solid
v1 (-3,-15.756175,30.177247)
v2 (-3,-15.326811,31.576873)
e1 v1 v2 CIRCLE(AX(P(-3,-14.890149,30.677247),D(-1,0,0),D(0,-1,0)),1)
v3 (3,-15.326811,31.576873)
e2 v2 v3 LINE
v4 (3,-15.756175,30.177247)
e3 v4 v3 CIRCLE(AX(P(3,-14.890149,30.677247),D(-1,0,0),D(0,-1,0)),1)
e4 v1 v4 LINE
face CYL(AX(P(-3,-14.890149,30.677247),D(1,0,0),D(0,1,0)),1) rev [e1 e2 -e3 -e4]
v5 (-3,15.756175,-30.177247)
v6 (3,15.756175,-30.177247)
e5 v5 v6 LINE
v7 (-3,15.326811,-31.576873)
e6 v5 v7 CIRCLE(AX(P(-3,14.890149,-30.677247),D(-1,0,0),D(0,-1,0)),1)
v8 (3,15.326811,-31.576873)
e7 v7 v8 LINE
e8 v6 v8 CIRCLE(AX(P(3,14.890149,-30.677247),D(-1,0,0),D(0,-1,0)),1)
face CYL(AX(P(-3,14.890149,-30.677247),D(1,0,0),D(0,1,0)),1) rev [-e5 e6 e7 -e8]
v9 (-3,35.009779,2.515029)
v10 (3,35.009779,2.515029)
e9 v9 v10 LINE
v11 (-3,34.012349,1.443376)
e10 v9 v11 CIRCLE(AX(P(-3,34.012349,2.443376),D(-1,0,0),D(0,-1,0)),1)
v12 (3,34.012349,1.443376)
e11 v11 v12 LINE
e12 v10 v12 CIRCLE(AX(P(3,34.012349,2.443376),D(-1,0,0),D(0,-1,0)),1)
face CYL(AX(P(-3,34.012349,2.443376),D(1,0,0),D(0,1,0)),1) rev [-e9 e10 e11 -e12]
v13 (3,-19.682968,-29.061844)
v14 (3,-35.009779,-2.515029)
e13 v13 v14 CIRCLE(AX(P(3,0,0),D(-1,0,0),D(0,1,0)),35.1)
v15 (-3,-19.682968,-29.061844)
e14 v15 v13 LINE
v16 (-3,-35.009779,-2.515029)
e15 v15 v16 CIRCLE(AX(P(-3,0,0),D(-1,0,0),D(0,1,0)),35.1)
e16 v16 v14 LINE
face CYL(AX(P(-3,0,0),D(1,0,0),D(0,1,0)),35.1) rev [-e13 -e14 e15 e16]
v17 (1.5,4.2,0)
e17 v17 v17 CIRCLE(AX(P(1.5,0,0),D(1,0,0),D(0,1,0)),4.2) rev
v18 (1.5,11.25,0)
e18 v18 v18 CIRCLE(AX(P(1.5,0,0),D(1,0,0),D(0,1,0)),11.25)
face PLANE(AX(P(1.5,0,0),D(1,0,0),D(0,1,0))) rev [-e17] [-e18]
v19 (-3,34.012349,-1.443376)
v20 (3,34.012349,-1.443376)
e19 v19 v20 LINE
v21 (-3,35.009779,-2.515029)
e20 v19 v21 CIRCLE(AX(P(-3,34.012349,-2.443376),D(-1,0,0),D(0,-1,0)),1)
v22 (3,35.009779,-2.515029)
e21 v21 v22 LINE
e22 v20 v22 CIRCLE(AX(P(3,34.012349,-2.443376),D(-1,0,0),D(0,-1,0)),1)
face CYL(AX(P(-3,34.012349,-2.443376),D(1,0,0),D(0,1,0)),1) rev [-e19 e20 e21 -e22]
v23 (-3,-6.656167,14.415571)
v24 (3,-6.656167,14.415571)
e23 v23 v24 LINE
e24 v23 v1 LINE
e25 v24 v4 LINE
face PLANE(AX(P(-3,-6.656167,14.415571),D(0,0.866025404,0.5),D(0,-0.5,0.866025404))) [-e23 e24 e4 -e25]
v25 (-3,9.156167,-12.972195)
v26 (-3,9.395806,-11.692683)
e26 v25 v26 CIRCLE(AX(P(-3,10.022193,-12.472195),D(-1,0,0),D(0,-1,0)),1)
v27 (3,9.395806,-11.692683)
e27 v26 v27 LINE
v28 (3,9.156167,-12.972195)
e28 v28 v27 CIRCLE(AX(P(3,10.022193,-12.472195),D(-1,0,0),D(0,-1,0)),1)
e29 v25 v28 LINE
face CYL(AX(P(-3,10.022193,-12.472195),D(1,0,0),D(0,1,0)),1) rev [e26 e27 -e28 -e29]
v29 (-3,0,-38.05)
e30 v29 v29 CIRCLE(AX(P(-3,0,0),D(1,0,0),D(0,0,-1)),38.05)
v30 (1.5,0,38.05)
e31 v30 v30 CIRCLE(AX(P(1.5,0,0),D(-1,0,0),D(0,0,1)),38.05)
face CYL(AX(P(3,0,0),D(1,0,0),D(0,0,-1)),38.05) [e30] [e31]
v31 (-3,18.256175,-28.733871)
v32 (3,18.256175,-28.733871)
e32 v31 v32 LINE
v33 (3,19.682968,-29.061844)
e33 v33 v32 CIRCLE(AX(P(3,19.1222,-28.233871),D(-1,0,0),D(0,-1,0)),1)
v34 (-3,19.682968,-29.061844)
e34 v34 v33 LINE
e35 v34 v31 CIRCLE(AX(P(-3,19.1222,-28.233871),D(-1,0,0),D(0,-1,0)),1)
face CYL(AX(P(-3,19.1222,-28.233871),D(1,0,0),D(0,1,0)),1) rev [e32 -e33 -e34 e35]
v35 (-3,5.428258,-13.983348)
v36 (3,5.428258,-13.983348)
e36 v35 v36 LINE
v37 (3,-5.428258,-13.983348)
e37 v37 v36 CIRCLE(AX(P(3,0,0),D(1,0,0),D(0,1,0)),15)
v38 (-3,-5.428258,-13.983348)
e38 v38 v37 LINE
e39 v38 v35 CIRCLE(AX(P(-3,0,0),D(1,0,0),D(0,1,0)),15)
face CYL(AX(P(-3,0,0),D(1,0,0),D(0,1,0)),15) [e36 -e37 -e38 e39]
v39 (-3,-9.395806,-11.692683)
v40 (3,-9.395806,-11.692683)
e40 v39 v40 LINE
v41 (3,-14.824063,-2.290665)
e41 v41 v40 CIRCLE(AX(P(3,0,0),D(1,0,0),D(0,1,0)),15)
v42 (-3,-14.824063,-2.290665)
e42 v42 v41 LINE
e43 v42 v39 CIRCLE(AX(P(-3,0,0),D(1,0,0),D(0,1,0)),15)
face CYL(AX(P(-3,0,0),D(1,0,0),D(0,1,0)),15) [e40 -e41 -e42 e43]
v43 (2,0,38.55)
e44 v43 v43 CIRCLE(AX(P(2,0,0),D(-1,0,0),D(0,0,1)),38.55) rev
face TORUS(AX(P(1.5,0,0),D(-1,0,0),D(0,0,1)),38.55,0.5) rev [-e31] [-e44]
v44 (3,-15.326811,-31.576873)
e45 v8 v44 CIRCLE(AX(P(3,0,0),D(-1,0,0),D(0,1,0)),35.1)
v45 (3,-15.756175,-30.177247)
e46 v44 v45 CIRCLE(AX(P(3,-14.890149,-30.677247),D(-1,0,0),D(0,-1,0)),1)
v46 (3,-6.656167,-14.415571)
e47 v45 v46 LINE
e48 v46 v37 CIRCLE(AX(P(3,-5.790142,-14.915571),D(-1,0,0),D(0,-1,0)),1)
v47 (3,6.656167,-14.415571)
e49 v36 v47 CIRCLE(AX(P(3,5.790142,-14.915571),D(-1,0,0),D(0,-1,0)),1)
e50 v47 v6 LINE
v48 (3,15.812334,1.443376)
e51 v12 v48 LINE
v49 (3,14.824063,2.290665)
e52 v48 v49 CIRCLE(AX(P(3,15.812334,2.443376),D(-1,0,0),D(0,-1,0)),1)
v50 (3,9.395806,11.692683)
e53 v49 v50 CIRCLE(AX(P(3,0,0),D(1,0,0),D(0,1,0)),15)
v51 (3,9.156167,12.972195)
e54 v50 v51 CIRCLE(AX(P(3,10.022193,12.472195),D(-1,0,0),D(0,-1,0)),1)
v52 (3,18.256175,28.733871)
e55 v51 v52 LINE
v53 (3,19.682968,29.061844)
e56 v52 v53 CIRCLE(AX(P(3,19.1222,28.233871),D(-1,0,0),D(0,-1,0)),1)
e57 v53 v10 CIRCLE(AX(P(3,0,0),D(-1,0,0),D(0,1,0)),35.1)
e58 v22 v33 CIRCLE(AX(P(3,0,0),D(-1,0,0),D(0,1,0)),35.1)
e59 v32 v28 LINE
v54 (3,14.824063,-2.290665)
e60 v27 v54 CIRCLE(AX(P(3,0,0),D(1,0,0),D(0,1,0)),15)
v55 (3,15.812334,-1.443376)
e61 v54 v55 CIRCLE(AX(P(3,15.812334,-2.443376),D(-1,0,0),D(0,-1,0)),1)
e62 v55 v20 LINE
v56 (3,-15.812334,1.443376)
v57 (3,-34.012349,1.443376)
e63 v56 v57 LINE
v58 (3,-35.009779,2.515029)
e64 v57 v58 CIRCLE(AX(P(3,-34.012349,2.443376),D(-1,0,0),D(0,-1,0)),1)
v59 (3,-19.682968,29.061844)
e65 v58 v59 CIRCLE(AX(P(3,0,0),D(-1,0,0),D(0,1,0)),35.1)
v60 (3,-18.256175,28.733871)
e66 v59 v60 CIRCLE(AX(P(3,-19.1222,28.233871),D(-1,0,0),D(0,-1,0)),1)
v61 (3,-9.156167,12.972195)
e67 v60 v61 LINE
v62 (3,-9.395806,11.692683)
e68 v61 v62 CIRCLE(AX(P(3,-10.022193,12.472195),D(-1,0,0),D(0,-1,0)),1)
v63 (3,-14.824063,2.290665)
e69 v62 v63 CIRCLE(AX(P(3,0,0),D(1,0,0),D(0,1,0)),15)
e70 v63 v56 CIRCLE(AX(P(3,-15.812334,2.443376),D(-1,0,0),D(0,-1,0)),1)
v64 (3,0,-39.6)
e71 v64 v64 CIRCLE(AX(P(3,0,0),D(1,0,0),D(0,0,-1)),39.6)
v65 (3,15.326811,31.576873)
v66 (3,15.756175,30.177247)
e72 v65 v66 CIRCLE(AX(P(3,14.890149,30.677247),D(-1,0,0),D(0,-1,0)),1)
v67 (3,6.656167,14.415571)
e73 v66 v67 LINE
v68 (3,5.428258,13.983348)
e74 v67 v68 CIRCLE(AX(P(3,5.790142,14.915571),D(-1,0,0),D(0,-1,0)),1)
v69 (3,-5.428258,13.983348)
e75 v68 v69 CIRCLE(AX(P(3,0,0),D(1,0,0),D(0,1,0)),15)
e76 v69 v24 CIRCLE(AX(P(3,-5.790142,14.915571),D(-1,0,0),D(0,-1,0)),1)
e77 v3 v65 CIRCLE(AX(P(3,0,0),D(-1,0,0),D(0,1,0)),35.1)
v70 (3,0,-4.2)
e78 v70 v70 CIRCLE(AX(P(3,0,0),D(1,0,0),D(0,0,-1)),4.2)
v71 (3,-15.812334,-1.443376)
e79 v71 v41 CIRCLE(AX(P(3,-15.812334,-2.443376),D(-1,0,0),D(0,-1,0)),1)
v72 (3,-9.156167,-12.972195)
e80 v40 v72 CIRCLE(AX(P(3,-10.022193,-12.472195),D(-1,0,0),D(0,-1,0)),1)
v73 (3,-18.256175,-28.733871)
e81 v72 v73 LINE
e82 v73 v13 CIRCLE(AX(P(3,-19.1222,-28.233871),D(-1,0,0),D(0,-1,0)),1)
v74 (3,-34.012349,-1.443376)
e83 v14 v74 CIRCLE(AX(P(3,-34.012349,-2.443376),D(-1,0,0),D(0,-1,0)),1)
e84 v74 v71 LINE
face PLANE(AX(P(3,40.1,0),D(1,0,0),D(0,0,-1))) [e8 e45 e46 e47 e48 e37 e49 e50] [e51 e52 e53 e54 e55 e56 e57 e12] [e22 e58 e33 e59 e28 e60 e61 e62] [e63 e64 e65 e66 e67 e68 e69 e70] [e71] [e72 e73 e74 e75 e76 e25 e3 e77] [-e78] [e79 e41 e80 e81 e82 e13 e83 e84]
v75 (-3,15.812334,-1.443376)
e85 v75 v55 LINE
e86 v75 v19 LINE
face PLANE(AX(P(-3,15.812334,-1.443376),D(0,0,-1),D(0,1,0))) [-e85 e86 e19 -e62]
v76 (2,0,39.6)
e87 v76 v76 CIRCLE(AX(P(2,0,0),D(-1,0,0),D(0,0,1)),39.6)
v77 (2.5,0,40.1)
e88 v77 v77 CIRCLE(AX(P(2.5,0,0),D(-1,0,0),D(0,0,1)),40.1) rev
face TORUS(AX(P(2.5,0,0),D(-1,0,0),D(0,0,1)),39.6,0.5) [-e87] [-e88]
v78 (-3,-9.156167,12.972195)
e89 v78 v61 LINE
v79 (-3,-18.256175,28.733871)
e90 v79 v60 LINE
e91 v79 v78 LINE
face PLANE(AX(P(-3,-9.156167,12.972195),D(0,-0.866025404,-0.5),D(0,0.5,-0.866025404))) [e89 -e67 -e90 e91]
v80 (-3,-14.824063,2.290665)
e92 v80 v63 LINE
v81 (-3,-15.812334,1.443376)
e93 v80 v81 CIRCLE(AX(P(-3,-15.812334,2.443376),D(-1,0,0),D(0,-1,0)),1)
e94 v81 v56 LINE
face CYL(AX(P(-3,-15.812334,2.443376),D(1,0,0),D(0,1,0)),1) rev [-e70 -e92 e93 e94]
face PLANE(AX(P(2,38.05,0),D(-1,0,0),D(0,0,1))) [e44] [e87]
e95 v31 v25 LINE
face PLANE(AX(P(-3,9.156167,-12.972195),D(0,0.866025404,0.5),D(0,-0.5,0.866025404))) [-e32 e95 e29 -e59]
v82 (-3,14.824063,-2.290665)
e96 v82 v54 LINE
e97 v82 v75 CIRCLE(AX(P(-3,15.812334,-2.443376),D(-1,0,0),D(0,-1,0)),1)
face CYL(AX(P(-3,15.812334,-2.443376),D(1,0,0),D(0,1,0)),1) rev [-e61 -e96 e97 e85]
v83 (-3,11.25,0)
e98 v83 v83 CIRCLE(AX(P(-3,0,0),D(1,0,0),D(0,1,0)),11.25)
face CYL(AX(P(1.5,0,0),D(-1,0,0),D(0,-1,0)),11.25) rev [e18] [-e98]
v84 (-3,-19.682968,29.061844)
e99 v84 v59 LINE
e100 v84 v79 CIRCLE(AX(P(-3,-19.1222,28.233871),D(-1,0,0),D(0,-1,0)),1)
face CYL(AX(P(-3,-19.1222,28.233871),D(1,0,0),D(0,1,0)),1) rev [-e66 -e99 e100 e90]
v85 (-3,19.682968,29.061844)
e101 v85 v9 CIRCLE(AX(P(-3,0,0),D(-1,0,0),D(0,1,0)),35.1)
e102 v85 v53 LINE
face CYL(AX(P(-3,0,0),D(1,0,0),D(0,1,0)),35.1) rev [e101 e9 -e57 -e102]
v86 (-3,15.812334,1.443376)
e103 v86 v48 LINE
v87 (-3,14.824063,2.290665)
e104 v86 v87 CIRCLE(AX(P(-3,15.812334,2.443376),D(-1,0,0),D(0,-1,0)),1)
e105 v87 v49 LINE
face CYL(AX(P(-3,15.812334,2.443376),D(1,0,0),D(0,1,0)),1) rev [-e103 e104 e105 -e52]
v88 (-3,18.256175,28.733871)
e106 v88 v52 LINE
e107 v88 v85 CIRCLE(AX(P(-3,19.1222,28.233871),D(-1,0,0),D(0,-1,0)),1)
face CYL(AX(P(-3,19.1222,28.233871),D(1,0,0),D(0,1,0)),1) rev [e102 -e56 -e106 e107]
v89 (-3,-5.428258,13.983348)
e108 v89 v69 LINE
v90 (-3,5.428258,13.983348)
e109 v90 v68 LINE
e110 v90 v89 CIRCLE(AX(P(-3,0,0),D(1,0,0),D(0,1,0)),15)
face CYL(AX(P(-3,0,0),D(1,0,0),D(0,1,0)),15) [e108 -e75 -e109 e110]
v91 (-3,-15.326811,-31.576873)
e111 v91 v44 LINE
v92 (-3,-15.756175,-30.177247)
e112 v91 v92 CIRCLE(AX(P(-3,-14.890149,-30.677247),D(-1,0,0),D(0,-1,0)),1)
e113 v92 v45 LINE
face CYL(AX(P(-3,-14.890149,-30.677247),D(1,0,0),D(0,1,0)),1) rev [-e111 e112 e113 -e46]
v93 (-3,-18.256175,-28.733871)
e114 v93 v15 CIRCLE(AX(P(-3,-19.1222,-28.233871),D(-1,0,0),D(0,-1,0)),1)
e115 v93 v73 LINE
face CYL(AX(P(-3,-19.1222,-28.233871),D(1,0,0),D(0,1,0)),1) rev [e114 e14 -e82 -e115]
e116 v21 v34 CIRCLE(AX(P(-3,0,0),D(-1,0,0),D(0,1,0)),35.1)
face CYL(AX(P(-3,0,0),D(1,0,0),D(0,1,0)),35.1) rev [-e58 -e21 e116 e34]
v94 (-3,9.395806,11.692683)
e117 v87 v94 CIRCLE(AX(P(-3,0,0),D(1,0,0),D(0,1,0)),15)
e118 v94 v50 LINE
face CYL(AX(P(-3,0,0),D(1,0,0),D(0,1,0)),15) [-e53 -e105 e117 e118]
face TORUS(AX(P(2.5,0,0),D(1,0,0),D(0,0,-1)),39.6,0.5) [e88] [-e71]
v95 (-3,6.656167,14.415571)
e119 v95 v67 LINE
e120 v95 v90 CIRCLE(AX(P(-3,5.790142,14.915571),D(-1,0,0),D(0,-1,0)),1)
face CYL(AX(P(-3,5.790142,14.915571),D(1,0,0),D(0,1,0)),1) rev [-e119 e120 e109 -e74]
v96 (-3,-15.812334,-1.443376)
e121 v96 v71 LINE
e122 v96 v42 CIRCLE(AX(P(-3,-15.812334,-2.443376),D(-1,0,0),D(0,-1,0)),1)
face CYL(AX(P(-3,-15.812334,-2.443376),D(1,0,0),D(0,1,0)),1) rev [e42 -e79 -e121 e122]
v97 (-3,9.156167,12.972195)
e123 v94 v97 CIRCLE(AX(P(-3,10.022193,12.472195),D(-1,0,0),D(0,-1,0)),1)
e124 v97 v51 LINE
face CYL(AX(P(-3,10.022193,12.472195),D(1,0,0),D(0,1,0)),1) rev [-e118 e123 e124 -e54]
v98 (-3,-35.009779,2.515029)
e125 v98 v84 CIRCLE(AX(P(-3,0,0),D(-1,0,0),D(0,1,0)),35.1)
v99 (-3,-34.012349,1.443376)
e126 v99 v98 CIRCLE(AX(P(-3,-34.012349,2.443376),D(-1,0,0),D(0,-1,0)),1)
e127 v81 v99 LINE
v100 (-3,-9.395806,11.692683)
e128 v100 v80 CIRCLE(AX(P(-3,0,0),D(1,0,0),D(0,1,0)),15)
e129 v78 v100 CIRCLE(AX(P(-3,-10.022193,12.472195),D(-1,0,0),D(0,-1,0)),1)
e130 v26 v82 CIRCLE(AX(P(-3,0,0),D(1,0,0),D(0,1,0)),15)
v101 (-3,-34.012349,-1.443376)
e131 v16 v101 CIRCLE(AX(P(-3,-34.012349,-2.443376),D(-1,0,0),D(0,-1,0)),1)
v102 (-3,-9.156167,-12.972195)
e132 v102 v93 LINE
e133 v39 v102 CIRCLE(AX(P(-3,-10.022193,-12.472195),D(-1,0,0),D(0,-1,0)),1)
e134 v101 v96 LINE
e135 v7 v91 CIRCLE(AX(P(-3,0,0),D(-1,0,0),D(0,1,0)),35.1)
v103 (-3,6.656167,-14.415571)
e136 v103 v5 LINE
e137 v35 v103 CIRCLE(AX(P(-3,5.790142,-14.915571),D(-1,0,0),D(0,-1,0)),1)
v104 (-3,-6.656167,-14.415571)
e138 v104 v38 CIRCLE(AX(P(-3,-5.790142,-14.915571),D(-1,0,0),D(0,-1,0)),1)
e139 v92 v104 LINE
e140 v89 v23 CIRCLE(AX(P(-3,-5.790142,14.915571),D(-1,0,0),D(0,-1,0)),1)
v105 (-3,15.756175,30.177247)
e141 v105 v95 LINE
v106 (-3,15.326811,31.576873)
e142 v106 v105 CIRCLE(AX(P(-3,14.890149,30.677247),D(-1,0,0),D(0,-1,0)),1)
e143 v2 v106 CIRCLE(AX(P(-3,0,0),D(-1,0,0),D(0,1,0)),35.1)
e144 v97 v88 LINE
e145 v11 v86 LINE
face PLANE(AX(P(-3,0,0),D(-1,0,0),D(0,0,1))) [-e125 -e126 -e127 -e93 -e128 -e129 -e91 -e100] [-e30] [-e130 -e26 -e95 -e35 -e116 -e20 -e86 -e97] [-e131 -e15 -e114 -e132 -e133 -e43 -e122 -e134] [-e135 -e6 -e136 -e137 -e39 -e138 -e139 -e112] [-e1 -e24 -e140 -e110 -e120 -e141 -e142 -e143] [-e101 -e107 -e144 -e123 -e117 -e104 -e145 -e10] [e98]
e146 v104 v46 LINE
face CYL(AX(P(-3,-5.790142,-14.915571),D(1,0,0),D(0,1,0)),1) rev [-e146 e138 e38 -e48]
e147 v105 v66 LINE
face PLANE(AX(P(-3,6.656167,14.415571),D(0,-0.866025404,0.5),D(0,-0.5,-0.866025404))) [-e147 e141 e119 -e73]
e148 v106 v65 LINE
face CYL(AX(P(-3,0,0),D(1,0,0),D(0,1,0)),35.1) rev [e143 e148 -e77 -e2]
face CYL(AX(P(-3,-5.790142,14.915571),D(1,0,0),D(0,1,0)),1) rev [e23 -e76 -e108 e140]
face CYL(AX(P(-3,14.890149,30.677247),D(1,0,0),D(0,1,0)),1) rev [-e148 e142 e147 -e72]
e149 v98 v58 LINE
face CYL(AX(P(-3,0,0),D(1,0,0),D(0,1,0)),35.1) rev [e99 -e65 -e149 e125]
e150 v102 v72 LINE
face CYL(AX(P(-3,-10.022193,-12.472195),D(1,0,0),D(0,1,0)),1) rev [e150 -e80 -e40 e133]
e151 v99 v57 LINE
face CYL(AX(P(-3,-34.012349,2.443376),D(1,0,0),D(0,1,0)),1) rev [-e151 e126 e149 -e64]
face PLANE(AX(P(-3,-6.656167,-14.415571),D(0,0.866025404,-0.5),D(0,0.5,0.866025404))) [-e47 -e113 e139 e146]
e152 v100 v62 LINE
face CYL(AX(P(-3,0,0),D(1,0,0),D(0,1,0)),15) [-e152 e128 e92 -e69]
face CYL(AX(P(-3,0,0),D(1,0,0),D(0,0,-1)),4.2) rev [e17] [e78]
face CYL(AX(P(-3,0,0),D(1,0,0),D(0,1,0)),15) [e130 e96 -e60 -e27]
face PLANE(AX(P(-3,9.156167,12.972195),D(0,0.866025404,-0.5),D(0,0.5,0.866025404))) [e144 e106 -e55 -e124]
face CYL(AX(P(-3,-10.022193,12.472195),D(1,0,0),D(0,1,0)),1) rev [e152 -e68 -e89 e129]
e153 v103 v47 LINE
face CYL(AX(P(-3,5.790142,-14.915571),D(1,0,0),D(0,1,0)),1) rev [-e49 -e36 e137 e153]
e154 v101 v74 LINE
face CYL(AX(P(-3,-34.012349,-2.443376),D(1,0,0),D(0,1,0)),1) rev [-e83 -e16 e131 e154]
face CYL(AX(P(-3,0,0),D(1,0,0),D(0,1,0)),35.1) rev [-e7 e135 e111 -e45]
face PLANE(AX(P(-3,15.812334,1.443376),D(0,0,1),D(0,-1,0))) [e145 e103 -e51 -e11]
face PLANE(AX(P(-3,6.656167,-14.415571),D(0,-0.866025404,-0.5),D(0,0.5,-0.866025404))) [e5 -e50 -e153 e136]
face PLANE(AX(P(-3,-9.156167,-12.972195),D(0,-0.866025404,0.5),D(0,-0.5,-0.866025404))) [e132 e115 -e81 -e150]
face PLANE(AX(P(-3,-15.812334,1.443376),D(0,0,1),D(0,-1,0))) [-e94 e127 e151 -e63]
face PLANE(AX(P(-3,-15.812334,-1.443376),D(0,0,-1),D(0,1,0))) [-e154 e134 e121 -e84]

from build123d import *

# Parameters (mm, degrees)
CUT_EXTRUDE2_DEPTH      = 58.026485075
FILLET1_R               = 0.5
CUT_EXTRUDE5_DEPTH      = 58.026485145
CUT_EXTRUDE5_DEPTH_BACK = 58.026485145
SKETCH7_R               = 4.2
SKETCH8_R               = 11.25
CUT_EXTRUDE6_DEPTH      = 4.5


with BuildPart() as part:
    # Sketch1 → Revolve2 (revolve)
    with BuildSketch(Plane.XY, mode=Mode.PRIVATE) as revolve2_sk:
        Polygon((-3, 0), (-3, 38.05), (2, 38.05), (2, 40.1), (3, 40.1), (3, 0), align=None)
    revolve(revolve2_sk.sketch.rotate(Axis((3, 0, 0), (-1, 0, 0)), 90), axis=Axis((3, 0, 0), (-1, 0, 0)))

    # Sketch2 → Cut-Extrude2 (cut, through all)
    with BuildSketch(Plane.ZY.offset(-3)):
        with BuildLine():
            Line((14.415571014, 6.656167139), (30.177246505, 15.756174727))
            ThreePointArc((30.177246505, 15.756174727), (30.970527299, 15.84617567), (31.576872502, 15.326810593))
            ThreePointArc((31.576872502, 15.326810593), (35.1, 0), (31.576872502, -15.326810593))
            ThreePointArc((31.576872502, -15.326810593), (30.970527299, -15.84617567), (30.177246505, -15.756174727))
            Line((30.177246505, -15.756174727), (14.415571014, -6.656167139))
            ThreePointArc((14.415571014, -6.656167139), (13.972302174, -6.122171697), (13.983347826, -5.428257877))
            ThreePointArc((13.983347826, -5.428257877), (15, 0), (13.983347826, 5.428257877))
            ThreePointArc((13.983347826, 5.428257877), (13.972302174, 6.122171697), (14.415571014, 6.656167139))
        make_face()
        with BuildLine():
            Line((12.972195341, -9.156167139), (28.733870832, -18.256174727))
            ThreePointArc((28.733870832, -18.256174727), (29.208454332, -18.898175575), (29.061843584, -19.682968463))
            ThreePointArc((29.061843584, -19.682968463), (17.55, -30.397491673), (2.515028919, -35.009779056))
            ThreePointArc((2.515028919, -35.009779056), (1.762072967, -34.744351245), (1.443375673, -34.012349453))
            Line((1.443375673, -34.012349453), (1.443375673, -15.812334278))
            ThreePointArc((1.443375673, -15.812334278), (1.684194871, -15.161454481), (2.290664693, -14.824063386))
            ThreePointArc((2.290664693, -14.824063386), (7.5, -12.990381057), (11.692683133, -9.395805509))
            ThreePointArc((11.692683133, -9.395805509), (12.288107303, -9.039282784), (12.972195341, -9.156167139))
        make_face()
        with BuildLine():
            Line((-1.443375673, -15.812334278), (-1.443375673, -34.012349453))
            ThreePointArc((-1.443375673, -34.012349453), (-1.762072967, -34.744351245), (-2.515028919, -35.009779056))
            ThreePointArc((-2.515028919, -35.009779056), (-17.55, -30.397491673), (-29.061843584, -19.682968463))
            ThreePointArc((-29.061843584, -19.682968463), (-29.208454332, -18.898175575), (-28.733870832, -18.256174727))
            Line((-28.733870832, -18.256174727), (-12.972195341, -9.156167139))
            ThreePointArc((-12.972195341, -9.156167139), (-12.288107303, -9.039282784), (-11.692683133, -9.395805509))
            ThreePointArc((-11.692683133, -9.395805509), (-7.5, -12.990381057), (-2.290664693, -14.824063386))
            ThreePointArc((-2.290664693, -14.824063386), (-1.684194871, -15.161454481), (-1.443375673, -15.812334278))
        make_face()
        with BuildLine():
            Line((-14.415571014, -6.656167139), (-30.177246505, -15.756174727))
            ThreePointArc((-30.177246505, -15.756174727), (-30.970527299, -15.84617567), (-31.576872502, -15.326810593))
            ThreePointArc((-31.576872502, -15.326810593), (-35.1, 0), (-31.576872502, 15.326810593))
            ThreePointArc((-31.576872502, 15.326810593), (-30.970527299, 15.84617567), (-30.177246505, 15.756174727))
            Line((-30.177246505, 15.756174727), (-14.415571014, 6.656167139))
            ThreePointArc((-14.415571014, 6.656167139), (-13.972302174, 6.122171697), (-13.983347826, 5.428257877))
            ThreePointArc((-13.983347826, 5.428257877), (-15, 0), (-13.983347826, -5.428257877))
            ThreePointArc((-13.983347826, -5.428257877), (-13.972302174, -6.122171697), (-14.415571014, -6.656167139))
        make_face()
        with BuildLine():
            Line((-12.972195341, 9.156167139), (-28.733870832, 18.256174727))
            ThreePointArc((-28.733870832, 18.256174727), (-29.208454332, 18.898175575), (-29.061843584, 19.682968463))
            ThreePointArc((-29.061843584, 19.682968463), (-17.55, 30.397491673), (-2.515028919, 35.009779056))
            ThreePointArc((-2.515028919, 35.009779056), (-1.762072967, 34.744351245), (-1.443375673, 34.012349453))
            Line((-1.443375673, 34.012349453), (-1.443375673, 15.812334278))
            ThreePointArc((-1.443375673, 15.812334278), (-1.684194871, 15.161454481), (-2.290664693, 14.824063386))
            ThreePointArc((-2.290664693, 14.824063386), (-7.5, 12.990381057), (-11.692683133, 9.395805509))
            ThreePointArc((-11.692683133, 9.395805509), (-12.288107303, 9.039282784), (-12.972195341, 9.156167139))
        make_face()
        with BuildLine():
            Line((1.443375673, 15.812334278), (1.443375673, 34.012349453))
            ThreePointArc((1.443375673, 34.012349453), (1.762072967, 34.744351245), (2.515028919, 35.009779056))
            ThreePointArc((2.515028919, 35.009779056), (17.55, 30.397491673), (29.061843584, 19.682968463))
            ThreePointArc((29.061843584, 19.682968463), (29.208454332, 18.898175575), (28.733870832, 18.256174727))
            Line((28.733870832, 18.256174727), (12.972195341, 9.156167139))
            ThreePointArc((12.972195341, 9.156167139), (12.288107303, 9.039282784), (11.692683133, 9.395805509))
            ThreePointArc((11.692683133, 9.395805509), (7.5, 12.990381057), (2.290664693, 14.824063386))
            ThreePointArc((2.290664693, 14.824063386), (1.684194871, 15.161454481), (1.443375673, 15.812334278))
        make_face()
    extrude(amount=CUT_EXTRUDE2_DEPTH, mode=Mode.SUBTRACT)

    # Fillet1
    fillet1_edges = [part.edges().sort_by_distance(p)[0] for p in [
        (3, 0, 40.1),
        (2, 0, 40.1),
        (2, 0, 38.05),
    ]]
    fillet(fillet1_edges, radius=FILLET1_R - 0.0001)  # a hair under: the kernel refuses the full size

    # Sketch7 → Cut-Extrude5 (cut, two sides: drawn at the far end of the back side and taken through both)
    with BuildSketch(Plane(origin=(3, 0, 0), x_dir=(0, 0, -1), z_dir=(1, 0, 0)).offset(-CUT_EXTRUDE5_DEPTH_BACK)):
        Circle(SKETCH7_R)
    extrude(amount=CUT_EXTRUDE5_DEPTH + CUT_EXTRUDE5_DEPTH_BACK, mode=Mode.SUBTRACT)

    # Sketch8 → Cut-Extrude6 (cut)
    with BuildSketch(Plane(origin=(-3, 0, 0), x_dir=(0, 0, -1), z_dir=(1, 0, 0))):
        with Locations(Location((0, 0, 0), (0, 0, 90))):
            Circle(SKETCH8_R)
    extrude(amount=CUT_EXTRUDE6_DEPTH, mode=Mode.SUBTRACT)


solid = part.part
